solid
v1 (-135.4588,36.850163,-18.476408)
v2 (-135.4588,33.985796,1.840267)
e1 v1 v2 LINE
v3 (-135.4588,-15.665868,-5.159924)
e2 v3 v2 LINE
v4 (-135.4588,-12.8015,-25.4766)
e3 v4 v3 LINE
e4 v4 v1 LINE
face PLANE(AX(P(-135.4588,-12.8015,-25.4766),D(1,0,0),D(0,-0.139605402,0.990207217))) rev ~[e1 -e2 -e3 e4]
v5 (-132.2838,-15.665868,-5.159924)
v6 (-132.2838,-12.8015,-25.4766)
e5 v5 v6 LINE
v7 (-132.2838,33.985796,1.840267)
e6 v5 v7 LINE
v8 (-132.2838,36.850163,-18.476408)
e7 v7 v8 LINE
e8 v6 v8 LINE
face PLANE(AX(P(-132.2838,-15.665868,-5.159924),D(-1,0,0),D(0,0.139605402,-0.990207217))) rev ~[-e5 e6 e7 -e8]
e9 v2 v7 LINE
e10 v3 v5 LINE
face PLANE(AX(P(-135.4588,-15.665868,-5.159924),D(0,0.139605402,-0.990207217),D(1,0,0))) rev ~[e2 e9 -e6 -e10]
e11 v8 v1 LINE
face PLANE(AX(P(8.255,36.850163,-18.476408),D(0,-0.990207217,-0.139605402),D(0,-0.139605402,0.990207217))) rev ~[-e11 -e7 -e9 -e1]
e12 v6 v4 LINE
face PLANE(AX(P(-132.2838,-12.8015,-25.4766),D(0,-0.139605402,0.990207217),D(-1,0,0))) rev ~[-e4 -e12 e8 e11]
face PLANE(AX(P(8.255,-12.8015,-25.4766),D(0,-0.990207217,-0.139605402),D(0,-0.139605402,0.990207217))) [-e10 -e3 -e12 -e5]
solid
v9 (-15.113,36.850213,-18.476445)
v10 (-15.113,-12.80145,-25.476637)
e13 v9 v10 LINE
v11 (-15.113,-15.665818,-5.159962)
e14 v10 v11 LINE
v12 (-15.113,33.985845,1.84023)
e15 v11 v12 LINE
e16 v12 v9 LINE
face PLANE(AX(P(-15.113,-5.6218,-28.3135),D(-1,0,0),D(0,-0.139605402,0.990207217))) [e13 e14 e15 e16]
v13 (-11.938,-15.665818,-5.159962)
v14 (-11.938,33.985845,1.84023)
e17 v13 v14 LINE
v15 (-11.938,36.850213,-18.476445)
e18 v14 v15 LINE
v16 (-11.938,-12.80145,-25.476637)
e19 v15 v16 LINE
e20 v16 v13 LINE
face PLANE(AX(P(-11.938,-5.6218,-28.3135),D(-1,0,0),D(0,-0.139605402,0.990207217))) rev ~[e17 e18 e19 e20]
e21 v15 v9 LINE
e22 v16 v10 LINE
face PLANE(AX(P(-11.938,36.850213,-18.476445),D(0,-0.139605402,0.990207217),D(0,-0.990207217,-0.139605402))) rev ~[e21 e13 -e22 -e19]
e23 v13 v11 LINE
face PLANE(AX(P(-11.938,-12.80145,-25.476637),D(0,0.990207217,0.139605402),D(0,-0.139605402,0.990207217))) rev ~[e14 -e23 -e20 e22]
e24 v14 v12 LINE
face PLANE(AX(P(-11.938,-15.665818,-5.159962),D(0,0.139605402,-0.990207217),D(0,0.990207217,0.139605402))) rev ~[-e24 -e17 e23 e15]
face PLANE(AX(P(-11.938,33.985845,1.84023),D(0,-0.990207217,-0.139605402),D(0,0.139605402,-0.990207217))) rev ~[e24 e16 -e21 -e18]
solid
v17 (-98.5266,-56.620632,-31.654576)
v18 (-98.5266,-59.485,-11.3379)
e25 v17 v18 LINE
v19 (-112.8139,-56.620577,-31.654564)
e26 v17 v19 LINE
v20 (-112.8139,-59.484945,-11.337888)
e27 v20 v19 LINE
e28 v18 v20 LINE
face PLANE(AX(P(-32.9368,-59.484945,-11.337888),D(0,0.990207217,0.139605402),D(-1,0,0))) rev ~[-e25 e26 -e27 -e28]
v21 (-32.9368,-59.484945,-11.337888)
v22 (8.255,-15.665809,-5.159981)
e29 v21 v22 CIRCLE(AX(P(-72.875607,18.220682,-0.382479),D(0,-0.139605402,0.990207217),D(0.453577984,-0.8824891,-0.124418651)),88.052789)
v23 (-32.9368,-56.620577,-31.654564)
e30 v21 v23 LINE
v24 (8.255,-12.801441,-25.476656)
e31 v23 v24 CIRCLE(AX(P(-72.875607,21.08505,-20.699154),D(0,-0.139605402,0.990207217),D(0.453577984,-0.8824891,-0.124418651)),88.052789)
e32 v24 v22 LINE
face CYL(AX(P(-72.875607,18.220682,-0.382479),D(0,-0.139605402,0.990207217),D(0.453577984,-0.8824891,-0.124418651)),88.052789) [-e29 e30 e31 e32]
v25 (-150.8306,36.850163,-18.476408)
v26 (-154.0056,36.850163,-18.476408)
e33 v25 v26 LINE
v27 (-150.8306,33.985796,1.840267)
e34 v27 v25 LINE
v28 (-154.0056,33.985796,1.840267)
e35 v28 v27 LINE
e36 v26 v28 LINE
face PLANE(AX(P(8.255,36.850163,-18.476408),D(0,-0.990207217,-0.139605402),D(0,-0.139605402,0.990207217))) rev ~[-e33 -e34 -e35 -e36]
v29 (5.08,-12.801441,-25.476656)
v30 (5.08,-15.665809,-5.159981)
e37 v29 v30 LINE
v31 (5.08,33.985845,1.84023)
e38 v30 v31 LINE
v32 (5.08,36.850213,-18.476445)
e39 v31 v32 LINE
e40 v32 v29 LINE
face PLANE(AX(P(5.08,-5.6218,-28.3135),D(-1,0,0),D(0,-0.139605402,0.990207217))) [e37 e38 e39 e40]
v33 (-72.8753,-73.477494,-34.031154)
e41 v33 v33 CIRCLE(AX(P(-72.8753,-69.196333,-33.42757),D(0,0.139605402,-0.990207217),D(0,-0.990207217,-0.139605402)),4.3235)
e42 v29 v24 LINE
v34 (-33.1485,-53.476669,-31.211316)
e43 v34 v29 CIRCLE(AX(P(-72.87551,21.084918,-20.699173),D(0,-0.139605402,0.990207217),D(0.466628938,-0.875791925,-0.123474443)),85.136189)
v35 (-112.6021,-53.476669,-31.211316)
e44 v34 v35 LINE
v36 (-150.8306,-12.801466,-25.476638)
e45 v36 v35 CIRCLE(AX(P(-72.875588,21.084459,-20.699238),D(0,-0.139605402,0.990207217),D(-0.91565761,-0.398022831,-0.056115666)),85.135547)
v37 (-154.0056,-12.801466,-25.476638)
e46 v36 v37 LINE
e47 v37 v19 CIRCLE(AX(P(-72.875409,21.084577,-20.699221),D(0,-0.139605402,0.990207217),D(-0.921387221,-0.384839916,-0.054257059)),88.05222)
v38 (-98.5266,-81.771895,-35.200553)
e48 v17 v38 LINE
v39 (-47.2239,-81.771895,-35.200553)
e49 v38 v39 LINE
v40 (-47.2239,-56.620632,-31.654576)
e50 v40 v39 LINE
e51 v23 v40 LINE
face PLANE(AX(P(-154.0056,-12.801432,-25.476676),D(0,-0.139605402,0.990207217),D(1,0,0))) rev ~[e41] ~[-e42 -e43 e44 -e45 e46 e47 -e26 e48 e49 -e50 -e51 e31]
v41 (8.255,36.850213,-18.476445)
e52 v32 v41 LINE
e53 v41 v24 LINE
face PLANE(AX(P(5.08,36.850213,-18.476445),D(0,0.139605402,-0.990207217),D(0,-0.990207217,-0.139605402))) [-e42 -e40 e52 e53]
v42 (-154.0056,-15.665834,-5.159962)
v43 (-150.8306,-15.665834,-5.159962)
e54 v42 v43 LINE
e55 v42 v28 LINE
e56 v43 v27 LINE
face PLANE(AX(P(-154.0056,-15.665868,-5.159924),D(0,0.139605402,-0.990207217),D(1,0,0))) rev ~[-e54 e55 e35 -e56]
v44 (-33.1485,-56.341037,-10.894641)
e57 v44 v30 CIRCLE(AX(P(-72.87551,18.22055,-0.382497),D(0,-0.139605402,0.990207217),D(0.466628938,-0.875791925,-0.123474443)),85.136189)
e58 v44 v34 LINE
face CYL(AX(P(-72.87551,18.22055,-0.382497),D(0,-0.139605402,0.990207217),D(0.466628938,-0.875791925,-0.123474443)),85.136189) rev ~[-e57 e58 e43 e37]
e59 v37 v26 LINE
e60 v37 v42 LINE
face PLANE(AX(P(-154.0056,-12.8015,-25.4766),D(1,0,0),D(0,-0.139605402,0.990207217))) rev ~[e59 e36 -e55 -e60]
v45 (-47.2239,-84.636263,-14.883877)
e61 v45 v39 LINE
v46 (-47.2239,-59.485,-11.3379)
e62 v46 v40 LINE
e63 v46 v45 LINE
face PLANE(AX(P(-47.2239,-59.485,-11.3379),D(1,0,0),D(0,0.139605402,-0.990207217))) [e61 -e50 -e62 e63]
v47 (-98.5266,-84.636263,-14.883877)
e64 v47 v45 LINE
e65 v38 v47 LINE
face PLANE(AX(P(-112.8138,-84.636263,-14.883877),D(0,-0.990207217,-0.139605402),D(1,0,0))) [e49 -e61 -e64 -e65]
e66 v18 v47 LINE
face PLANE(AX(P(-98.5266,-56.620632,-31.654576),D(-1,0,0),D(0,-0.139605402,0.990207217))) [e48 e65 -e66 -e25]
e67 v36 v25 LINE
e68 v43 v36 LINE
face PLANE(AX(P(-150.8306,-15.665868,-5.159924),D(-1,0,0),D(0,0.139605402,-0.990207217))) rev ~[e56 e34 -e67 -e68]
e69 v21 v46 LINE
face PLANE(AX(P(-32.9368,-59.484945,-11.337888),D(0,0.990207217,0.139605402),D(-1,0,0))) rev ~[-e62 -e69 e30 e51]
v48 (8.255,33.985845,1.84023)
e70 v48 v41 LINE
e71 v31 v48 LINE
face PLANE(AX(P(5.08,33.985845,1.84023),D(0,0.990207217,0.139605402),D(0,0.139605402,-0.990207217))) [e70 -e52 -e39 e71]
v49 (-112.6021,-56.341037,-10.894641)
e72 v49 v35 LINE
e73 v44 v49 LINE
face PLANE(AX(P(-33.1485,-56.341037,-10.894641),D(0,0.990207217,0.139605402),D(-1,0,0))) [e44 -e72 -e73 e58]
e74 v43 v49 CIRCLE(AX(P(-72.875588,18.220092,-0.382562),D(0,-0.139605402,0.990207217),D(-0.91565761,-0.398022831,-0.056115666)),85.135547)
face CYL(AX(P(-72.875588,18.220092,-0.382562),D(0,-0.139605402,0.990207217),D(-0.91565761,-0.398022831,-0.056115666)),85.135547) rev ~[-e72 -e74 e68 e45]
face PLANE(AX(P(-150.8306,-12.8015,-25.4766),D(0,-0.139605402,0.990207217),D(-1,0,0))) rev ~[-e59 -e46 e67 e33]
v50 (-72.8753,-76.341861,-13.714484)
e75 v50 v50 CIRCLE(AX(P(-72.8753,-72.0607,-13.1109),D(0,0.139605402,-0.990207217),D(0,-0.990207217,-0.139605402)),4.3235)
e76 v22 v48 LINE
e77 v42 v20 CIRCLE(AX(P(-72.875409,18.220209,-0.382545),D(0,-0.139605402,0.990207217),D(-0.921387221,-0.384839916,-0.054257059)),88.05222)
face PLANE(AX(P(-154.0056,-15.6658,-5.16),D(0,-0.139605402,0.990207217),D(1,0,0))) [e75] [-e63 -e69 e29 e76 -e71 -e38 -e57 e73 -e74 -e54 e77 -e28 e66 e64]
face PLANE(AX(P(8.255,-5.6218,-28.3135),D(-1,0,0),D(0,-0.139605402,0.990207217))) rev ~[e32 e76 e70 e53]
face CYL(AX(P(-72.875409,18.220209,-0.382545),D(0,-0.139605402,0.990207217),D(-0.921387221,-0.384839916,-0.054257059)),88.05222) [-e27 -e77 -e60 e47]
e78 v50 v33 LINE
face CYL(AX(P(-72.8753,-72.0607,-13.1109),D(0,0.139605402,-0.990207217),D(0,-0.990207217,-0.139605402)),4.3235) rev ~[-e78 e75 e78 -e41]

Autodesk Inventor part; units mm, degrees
ref_plane "YZ Plane" through (0, 0, 0) normal (1, 0, 0) x (0, 1, 0)
ref_plane "XZ Plane" through (0, 0, 0) normal (0, 1, 0) x (-1, 0, 0)
ref_plane "XY Plane" through (0, 0, 0) normal (0, 0, 1) x (1, 0, 0)
sketch "Sketch1" plane through (0, 0, 0) normal (1, 0, 0) x (0, 1, 0)
  spline S0 degree 3 poles (-12.7596, 69.1102) (-15.2298, 61.5354) (-16.003, 54.7493) (-14.7341, 46.512) (-13.9585, 44.5403) (-12.6997, 40.1512) (-11.8689, 37.886) (-10.5675, 32.6221) (-10.0341, 29.5076) (-9.2498, 23.4956) (-9.1586, 20.4828) (-8.7362, 14.9457) (-8.298, 12.4468) (-8.4378, 7.0305) (-9.5013, 4.1287) (-9.4732, -0.7666) (-9.0812, -2.8089) (-8.7088, -6.0813) (-8.5625, -7.3217) (-8.4075, -8.5547) knots 0 0 0 0 0.241973 0.241973 0.332352 0.332352 0.424089 0.424089 0.541798 0.541798 0.658072 0.658072 0.76087 0.76087 0.872069 0.872069 0.951758 0.951758 1 1 1 1 construction
  spline S1 degree 3 poles (-8.4075, -8.5547) (-8.309, -9.3389) (-8.207, -10.12) (-7.7153, -13.7099) (-7.2118, -16.3393) (-6.3841, -22.1405) (-6.6665, -24.8142) (-5.6218, -28.3135) knots 0 0 0 0 0.119502 0.119502 0.553846 0.553846 1 1 1 1 construction
  spline S2 degree 3 poles (-5.6218, -28.3135) (-4.1228, -33.3346) (0.624, -41.8906) (3.9625, -48.268) (4.5736, -49.3774) (8.1498, -55.2575) (12.792, -61.9002) (17.7565, -68.8098) (19.0389, -70.9296) (26.2047, -78.6536) (35.4784, -85.2147) (49.0059, -92.3069) (55.6073, -92.3063) (68.5377, -94.6562) (74.996, -95.2419) (83.2666, -94.7145) (86.6124, -93.0362) (89.415, -93.015) (89.4684, -93.7995) (89.9841, -94.339) (90.2258, -94.7218) (89.67, -94.6644) (89.4356, -94.0936) (87.2104, -94.21) (84.8902, -94.7513) (80.0382, -96.05) (76.8909, -97.5474) (70.3825, -98.6246) (66.2945, -98.5443) (60.1257, -98.0168) (58.2481, -97.7121) (54.5132, -96.7744) (53.8418, -96.5978) (53.124, -96.4018) knots 0 0 0 0 0.060463 0.060463 0.088876 0.088876 0.149034 0.149034 0.189187 0.189187 0.280144 0.280144 0.381032 0.381032 0.501928 0.501928 0.587779 0.587779 0.653298 0.653298 0.710459 0.710459 0.757232 0.757232 0.814775 0.814775 0.872532 0.872532 0.939307 0.939307 0.990036 0.990036 1 1 1 1 construction
  spline S3 degree 3 poles (29.4725, -27.9505) (29.7232, -28.7604) (30.1347, -29.057) (32.5515, -32.3248) (34.3621, -34.4691) (37.878, -38.892) (37.7974, -39.3941) (41.586, -43.4308) (43.873, -45.7682) (49.5626, -50.6314) (51.8392, -50.9545) (60.2395, -53.9595) (66.6243, -55.2783) (76.7213, -57.0347) (82.4961, -56.8836) (87.4768, -57.2216) (87.6182, -57.0776) (89.8132, -57.4611) (91.5195, -57.7058) (92.188, -58.3474) (92.2546, -58.677) (90.5785, -59.545) (88.9174, -60.1439) (85.9397, -61.0379) (84.1283, -61.4382) (81.4338, -61.8751) (80.6089, -61.9837) (79.7567, -62.0753) knots 0 0 0 0 0.04737 0.04737 0.082065 0.082065 0.155524 0.155524 0.204555 0.204555 0.315622 0.315622 0.438816 0.438816 0.586443 0.586443 0.691275 0.691275 0.771281 0.771281 0.841079 0.841079 0.898194 0.898194 0.96846 0.96846 1 1 1 1 construction
  spline S4 degree 3 poles (28.8564, -23.7777) (28.9042, -24.5022) (28.9667, -25.1696) (29.2425, -26.8854) (29.3324, -27.498) (29.4725, -27.9505) knots 0 0 0 0 0.335914 0.335914 1 1 1 1 construction
  spline S5 degree 3 poles (27.5568, -11.1594) (27.8944, -13.1016) (28.2256, -15.1008) (28.7027, -19.1945) (28.7203, -21.7171) (28.8564, -23.7777) knots 0 0 0 0 0.46171 0.46171 1 1 1 1 construction
  spline S6 degree 3 poles (26.2925, -4.4074) (26.5211, -5.6352) (26.805, -6.8301) (27.1945, -9.1012) (27.3765, -10.1222) (27.5568, -11.1594) knots 0 0 0 0 0.568778 0.568778 1 1 1 1 construction
  spline S7 degree 3 poles (16.0432, 69.6268) (18.6865, 66.183) (20.6385, 61.0286) (22.3448, 51.7367) (22.7474, 48.7933) (23.2098, 43.6518) (23.1117, 41.1975) (23.483, 35.6031) (24.0275, 32.6396) (24.3977, 26.501) (24.1107, 23.3997) (24.6444, 17.6215) (25.4306, 14.8381) (25.926, 9.3729) (25.7134, 6.8435) (25.8358, 1.9262) (25.7789, -0.3383) (26.0611, -3.0685) (26.1687, -3.7428) (26.2925, -4.4074) knots 0 0 0 0 0.257427 0.257427 0.348427 0.348427 0.440796 0.440796 0.559313 0.559313 0.676387 0.676387 0.779892 0.779892 0.891856 0.891856 0.972092 0.972092 1 1 1 1 construction
  point P0 (0, 0)
ref_plane "Work Plane1" through (0, -5.6218, -28.3135) normal (-1, 0, 0) x (0, -0.1396054, 0.9902072)
ref_plane "Work Plane2" through (5.08, -5.6218, -28.3135) normal (-1, 0, 0) x (0, -0.1396054, 0.9902072)
sketch "Sketch2" plane through (5.08, -5.6218, -28.3135) normal (-1, 0, 0) x (0, -0.1396054, 0.9902072)
  line L0 (3.8114, -6.7133) -> (24.329, -6.7133)
  line L1 (24.329, -6.7133) -> (24.329, 43.4294)
  line L2 (24.329, 43.4294) -> (3.8114, 43.4294)
  line L3 (3.8114, 43.4294) -> (3.8114, -6.7133)
  point P0 (27.2514, 9.5195)
extrude "Extrusion1" add sketch "Sketch2" against normal blind 3.175
ref_plane "Work Plane3" through (-11.938, -5.6218, -28.3135) normal (-1, 0, 0) x (0, -0.1396054, 0.9902072)
sketch "Sketch3" plane through (-11.938, -5.6218, -28.3135) normal (-1, 0, 0) x (0, -0.1396054, 0.9902072)
  line L0 (24.329, -6.7133) -> (24.329, 43.4294) projected
  line L1 (24.329, 43.4294) -> (3.8114, 43.4294) projected
  line L2 (3.8114, 43.4294) -> (3.8114, -6.7133) projected
  line L3 (3.8114, -6.7133) -> (24.329, -6.7133) projected
  point P0 (27.2514, 9.5195)
extrude "Extrusion2" add sketch "Sketch3" along normal blind 3.175
sketch "Sketch4" plane through (5.08, -5.6218, -28.3135) normal (-1, 0, 0) x (0, -0.1396054, 0.9902072)
  point P0 (27.2514, 9.5195)
ref_plane "Work Plane4" through (6.6675, 33.9858, 1.8402) normal (0, 0.9902072, 0.1396054) x (0, 0.1396054, -0.9902072)
ref_plane "Work Plane5" through (8.255, -12.8015, -25.4766) normal (0, -0.9902072, -0.1396054) x (0, -0.1396054, 0.9902072)
sketch "Sketch5" plane through (8.255, -12.8015, -25.4766) normal (0, -0.9902072, -0.1396054) x (0, -0.1396054, 0.9902072)
  line L0 (0, 20.193) -> (0, 23.368) construction
  line L1 (20.5176, 20.193) -> (20.5176, 23.368) construction
  line L2 (0, 23.368) -> (0, 209.8691) construction
  line L3 (0, 143.7138) -> (20.5176, 143.7138)
  line L4 (20.5176, 143.7138) -> (20.5176, 140.5388)
  line L5 (20.5176, 140.5388) -> (0, 140.5388)
  line L6 (0, 140.5388) -> (0, 143.7138)
  line L7 (0, 162.2606) -> (20.5176, 162.2606)
  line L8 (20.5176, 162.2606) -> (20.5176, 159.0856)
  line L9 (20.5176, 159.0856) -> (0, 159.0856)
  line L10 (0, 159.0856) -> (0, 162.2606)
  point P0 (23.44, 8.255)
  dimension "d6" = 3.175
  dimension "d7" = 3.175
extrude "Extrusion3" add sketch "Sketch5" against normal up to surface (50.1427 mm away)
sketch "Sketch7" plane through (8.255, -12.8015, -25.4766) normal (0, -0.9902072, -0.1396054) x (0, -0.1396054, 0.9902072)
  line L0 (0, 3.175) -> (20.5176, 3.175) projected
  line L1 (0, 3.175) -> (0, 0) projected
  line L2 (20.5176, 0) -> (0, 0) projected
  line L3 (20.5176, 3.175) -> (20.5176, 0) projected
  line L4 (0, 159.0856) -> (20.5176, 159.0856) projected
  line L5 (20.5176, 159.0856) -> (20.5176, 162.2606) projected
  line L6 (20.5176, 162.2606) -> (0, 162.2606) projected
  line L7 (0, 162.2606) -> (0, 159.0856) projected
  point P0 (23.44, 8.255)
sketch "Sketch8" plane through (-154.0056, -15.6658, -5.16) normal (0, -0.1396054, 0.9902072) x (1, 0, 0)
  line L0 (159.0856, 0) -> (159.0856, 50.1427) projected
  line L1 (159.0856, 0) -> (162.2606, 0) projected
  line L2 (162.2606, 50.1427) -> (162.2606, 0) projected
  line L3 (159.0856, 50.1427) -> (162.2606, 50.1427) projected
  line L4 (3.175, 50.1427) -> (0, 50.1427) projected
  line L5 (0, 0) -> (0, 50.1427) projected
  line L6 (3.175, 0) -> (0, 0) projected
  line L7 (3.175, 0) -> (3.175, 50.1427) projected
  line L8 (120.8571, -41.0775) -> (41.4035, -41.0775)
  arc A0 (3.175, 0) -> (41.4035, -41.0775) centre (81.1303, 34.2212) ccw
  arc A1 (120.8571, -41.0775) -> (159.0856, 0) centre (81.1303, 34.2212) ccw
  arc A2 (121.0688, -44.2525) -> (162.2606, 0) centre (81.1303, 34.2212) ccw
  line L9 (121.0688, -44.2525) -> (41.1917, -44.2525)
  arc A3 (0, 0) -> (41.1917, -44.2525) centre (81.1303, 34.2212) ccw
  line L10 (0, 0) -> (0, 50.1427) projected
  line L11 (162.2606, 50.1427) -> (162.2606, 0) projected
  line L12 (200.1965, 0) -> (-37.9359, 0) projected
  point P0 (154.0056, 16.2328)
  dimension "d10" = 41.0775
  dimension "d12" = 3.175
extrude "Extrusion4" add sketch "Sketch8" against normal up to surface (20.5176 mm away) contours L1 A2 L9 A3 L6 A0 L8 A1
sketch "Sketch9" plane through (-112.8138, -59.485, -11.3379) normal (0, -0.9902072, -0.1396054) x (1, 0, 0)
  line L0 (0, -20.5176) -> (79.8771, -20.5176) projected
  line L1 (79.8771, 0) -> (79.8771, -20.5176) projected
  line L2 (0, 0) -> (79.8771, 0) projected
  line L3 (0, 0) -> (0, -20.5176) projected
  line L4 (14.2872, 0) -> (65.5899, 0)
  line L5 (65.5899, 0) -> (65.5899, -20.5176)
  line L6 (65.5899, -20.5176) -> (14.2872, -20.5176)
  line L7 (14.2872, -20.5176) -> (14.2872, 0)
  point P0 (112.8138, 2.9224)
  point P1 (14.2872, -10.2588)
  point P2 (0, -10.2588)
  point P3 (79.8771, -10.2588)
  point P4 (65.5899, -10.2588)
  dimension "d15" = 14.2872
  dimension "d16" = 14.2872
extrude "Extrusion5" add sketch "Sketch9" along normal blind 25.4 contours L7 L2 L5 L0
sketch "Sketch10" plane through (-112.6021, -56.3411, -10.8946) normal (0, -0.1396054, 0.9902072) x (1, 0, 0)
  line L0 (65.3781, -28.575) -> (14.0755, -28.575) projected
  line L1 (-0.2118, -3.175) -> (14.0755, -3.175) projected
  line L2 (65.3781, -28.575) -> (14.0755, -28.575)
  line L3 (14.0755, -28.575) -> (14.0755, -3.175)
  line L4 (14.0755, -3.175) -> (65.3781, -3.175)
  line L5 (65.3781, -3.175) -> (65.3781, -28.575)
  circle A0 centre (39.7268, -15.875) radius 5
  point P0 (112.6021, 57.3103)
  dimension "d19" = 10
hole "Hole1" at (-72.8753, -72.0607, -13.1109) direction (0, 0.1396054, -0.9902072) diameter 8.647 end through all thread size "M10x1.25" class "6H" standard "ANSI Metric M Profile"
sketch "Sketch11" plane through (-112.6021, -56.3411, -10.8946) normal (0, -0.1396054, 0.9902072) x (1, 0, 0)
  point P0 (112.6021, 57.3103)
equation "\"d16\" = d15"
properties part number "imu_mount"
